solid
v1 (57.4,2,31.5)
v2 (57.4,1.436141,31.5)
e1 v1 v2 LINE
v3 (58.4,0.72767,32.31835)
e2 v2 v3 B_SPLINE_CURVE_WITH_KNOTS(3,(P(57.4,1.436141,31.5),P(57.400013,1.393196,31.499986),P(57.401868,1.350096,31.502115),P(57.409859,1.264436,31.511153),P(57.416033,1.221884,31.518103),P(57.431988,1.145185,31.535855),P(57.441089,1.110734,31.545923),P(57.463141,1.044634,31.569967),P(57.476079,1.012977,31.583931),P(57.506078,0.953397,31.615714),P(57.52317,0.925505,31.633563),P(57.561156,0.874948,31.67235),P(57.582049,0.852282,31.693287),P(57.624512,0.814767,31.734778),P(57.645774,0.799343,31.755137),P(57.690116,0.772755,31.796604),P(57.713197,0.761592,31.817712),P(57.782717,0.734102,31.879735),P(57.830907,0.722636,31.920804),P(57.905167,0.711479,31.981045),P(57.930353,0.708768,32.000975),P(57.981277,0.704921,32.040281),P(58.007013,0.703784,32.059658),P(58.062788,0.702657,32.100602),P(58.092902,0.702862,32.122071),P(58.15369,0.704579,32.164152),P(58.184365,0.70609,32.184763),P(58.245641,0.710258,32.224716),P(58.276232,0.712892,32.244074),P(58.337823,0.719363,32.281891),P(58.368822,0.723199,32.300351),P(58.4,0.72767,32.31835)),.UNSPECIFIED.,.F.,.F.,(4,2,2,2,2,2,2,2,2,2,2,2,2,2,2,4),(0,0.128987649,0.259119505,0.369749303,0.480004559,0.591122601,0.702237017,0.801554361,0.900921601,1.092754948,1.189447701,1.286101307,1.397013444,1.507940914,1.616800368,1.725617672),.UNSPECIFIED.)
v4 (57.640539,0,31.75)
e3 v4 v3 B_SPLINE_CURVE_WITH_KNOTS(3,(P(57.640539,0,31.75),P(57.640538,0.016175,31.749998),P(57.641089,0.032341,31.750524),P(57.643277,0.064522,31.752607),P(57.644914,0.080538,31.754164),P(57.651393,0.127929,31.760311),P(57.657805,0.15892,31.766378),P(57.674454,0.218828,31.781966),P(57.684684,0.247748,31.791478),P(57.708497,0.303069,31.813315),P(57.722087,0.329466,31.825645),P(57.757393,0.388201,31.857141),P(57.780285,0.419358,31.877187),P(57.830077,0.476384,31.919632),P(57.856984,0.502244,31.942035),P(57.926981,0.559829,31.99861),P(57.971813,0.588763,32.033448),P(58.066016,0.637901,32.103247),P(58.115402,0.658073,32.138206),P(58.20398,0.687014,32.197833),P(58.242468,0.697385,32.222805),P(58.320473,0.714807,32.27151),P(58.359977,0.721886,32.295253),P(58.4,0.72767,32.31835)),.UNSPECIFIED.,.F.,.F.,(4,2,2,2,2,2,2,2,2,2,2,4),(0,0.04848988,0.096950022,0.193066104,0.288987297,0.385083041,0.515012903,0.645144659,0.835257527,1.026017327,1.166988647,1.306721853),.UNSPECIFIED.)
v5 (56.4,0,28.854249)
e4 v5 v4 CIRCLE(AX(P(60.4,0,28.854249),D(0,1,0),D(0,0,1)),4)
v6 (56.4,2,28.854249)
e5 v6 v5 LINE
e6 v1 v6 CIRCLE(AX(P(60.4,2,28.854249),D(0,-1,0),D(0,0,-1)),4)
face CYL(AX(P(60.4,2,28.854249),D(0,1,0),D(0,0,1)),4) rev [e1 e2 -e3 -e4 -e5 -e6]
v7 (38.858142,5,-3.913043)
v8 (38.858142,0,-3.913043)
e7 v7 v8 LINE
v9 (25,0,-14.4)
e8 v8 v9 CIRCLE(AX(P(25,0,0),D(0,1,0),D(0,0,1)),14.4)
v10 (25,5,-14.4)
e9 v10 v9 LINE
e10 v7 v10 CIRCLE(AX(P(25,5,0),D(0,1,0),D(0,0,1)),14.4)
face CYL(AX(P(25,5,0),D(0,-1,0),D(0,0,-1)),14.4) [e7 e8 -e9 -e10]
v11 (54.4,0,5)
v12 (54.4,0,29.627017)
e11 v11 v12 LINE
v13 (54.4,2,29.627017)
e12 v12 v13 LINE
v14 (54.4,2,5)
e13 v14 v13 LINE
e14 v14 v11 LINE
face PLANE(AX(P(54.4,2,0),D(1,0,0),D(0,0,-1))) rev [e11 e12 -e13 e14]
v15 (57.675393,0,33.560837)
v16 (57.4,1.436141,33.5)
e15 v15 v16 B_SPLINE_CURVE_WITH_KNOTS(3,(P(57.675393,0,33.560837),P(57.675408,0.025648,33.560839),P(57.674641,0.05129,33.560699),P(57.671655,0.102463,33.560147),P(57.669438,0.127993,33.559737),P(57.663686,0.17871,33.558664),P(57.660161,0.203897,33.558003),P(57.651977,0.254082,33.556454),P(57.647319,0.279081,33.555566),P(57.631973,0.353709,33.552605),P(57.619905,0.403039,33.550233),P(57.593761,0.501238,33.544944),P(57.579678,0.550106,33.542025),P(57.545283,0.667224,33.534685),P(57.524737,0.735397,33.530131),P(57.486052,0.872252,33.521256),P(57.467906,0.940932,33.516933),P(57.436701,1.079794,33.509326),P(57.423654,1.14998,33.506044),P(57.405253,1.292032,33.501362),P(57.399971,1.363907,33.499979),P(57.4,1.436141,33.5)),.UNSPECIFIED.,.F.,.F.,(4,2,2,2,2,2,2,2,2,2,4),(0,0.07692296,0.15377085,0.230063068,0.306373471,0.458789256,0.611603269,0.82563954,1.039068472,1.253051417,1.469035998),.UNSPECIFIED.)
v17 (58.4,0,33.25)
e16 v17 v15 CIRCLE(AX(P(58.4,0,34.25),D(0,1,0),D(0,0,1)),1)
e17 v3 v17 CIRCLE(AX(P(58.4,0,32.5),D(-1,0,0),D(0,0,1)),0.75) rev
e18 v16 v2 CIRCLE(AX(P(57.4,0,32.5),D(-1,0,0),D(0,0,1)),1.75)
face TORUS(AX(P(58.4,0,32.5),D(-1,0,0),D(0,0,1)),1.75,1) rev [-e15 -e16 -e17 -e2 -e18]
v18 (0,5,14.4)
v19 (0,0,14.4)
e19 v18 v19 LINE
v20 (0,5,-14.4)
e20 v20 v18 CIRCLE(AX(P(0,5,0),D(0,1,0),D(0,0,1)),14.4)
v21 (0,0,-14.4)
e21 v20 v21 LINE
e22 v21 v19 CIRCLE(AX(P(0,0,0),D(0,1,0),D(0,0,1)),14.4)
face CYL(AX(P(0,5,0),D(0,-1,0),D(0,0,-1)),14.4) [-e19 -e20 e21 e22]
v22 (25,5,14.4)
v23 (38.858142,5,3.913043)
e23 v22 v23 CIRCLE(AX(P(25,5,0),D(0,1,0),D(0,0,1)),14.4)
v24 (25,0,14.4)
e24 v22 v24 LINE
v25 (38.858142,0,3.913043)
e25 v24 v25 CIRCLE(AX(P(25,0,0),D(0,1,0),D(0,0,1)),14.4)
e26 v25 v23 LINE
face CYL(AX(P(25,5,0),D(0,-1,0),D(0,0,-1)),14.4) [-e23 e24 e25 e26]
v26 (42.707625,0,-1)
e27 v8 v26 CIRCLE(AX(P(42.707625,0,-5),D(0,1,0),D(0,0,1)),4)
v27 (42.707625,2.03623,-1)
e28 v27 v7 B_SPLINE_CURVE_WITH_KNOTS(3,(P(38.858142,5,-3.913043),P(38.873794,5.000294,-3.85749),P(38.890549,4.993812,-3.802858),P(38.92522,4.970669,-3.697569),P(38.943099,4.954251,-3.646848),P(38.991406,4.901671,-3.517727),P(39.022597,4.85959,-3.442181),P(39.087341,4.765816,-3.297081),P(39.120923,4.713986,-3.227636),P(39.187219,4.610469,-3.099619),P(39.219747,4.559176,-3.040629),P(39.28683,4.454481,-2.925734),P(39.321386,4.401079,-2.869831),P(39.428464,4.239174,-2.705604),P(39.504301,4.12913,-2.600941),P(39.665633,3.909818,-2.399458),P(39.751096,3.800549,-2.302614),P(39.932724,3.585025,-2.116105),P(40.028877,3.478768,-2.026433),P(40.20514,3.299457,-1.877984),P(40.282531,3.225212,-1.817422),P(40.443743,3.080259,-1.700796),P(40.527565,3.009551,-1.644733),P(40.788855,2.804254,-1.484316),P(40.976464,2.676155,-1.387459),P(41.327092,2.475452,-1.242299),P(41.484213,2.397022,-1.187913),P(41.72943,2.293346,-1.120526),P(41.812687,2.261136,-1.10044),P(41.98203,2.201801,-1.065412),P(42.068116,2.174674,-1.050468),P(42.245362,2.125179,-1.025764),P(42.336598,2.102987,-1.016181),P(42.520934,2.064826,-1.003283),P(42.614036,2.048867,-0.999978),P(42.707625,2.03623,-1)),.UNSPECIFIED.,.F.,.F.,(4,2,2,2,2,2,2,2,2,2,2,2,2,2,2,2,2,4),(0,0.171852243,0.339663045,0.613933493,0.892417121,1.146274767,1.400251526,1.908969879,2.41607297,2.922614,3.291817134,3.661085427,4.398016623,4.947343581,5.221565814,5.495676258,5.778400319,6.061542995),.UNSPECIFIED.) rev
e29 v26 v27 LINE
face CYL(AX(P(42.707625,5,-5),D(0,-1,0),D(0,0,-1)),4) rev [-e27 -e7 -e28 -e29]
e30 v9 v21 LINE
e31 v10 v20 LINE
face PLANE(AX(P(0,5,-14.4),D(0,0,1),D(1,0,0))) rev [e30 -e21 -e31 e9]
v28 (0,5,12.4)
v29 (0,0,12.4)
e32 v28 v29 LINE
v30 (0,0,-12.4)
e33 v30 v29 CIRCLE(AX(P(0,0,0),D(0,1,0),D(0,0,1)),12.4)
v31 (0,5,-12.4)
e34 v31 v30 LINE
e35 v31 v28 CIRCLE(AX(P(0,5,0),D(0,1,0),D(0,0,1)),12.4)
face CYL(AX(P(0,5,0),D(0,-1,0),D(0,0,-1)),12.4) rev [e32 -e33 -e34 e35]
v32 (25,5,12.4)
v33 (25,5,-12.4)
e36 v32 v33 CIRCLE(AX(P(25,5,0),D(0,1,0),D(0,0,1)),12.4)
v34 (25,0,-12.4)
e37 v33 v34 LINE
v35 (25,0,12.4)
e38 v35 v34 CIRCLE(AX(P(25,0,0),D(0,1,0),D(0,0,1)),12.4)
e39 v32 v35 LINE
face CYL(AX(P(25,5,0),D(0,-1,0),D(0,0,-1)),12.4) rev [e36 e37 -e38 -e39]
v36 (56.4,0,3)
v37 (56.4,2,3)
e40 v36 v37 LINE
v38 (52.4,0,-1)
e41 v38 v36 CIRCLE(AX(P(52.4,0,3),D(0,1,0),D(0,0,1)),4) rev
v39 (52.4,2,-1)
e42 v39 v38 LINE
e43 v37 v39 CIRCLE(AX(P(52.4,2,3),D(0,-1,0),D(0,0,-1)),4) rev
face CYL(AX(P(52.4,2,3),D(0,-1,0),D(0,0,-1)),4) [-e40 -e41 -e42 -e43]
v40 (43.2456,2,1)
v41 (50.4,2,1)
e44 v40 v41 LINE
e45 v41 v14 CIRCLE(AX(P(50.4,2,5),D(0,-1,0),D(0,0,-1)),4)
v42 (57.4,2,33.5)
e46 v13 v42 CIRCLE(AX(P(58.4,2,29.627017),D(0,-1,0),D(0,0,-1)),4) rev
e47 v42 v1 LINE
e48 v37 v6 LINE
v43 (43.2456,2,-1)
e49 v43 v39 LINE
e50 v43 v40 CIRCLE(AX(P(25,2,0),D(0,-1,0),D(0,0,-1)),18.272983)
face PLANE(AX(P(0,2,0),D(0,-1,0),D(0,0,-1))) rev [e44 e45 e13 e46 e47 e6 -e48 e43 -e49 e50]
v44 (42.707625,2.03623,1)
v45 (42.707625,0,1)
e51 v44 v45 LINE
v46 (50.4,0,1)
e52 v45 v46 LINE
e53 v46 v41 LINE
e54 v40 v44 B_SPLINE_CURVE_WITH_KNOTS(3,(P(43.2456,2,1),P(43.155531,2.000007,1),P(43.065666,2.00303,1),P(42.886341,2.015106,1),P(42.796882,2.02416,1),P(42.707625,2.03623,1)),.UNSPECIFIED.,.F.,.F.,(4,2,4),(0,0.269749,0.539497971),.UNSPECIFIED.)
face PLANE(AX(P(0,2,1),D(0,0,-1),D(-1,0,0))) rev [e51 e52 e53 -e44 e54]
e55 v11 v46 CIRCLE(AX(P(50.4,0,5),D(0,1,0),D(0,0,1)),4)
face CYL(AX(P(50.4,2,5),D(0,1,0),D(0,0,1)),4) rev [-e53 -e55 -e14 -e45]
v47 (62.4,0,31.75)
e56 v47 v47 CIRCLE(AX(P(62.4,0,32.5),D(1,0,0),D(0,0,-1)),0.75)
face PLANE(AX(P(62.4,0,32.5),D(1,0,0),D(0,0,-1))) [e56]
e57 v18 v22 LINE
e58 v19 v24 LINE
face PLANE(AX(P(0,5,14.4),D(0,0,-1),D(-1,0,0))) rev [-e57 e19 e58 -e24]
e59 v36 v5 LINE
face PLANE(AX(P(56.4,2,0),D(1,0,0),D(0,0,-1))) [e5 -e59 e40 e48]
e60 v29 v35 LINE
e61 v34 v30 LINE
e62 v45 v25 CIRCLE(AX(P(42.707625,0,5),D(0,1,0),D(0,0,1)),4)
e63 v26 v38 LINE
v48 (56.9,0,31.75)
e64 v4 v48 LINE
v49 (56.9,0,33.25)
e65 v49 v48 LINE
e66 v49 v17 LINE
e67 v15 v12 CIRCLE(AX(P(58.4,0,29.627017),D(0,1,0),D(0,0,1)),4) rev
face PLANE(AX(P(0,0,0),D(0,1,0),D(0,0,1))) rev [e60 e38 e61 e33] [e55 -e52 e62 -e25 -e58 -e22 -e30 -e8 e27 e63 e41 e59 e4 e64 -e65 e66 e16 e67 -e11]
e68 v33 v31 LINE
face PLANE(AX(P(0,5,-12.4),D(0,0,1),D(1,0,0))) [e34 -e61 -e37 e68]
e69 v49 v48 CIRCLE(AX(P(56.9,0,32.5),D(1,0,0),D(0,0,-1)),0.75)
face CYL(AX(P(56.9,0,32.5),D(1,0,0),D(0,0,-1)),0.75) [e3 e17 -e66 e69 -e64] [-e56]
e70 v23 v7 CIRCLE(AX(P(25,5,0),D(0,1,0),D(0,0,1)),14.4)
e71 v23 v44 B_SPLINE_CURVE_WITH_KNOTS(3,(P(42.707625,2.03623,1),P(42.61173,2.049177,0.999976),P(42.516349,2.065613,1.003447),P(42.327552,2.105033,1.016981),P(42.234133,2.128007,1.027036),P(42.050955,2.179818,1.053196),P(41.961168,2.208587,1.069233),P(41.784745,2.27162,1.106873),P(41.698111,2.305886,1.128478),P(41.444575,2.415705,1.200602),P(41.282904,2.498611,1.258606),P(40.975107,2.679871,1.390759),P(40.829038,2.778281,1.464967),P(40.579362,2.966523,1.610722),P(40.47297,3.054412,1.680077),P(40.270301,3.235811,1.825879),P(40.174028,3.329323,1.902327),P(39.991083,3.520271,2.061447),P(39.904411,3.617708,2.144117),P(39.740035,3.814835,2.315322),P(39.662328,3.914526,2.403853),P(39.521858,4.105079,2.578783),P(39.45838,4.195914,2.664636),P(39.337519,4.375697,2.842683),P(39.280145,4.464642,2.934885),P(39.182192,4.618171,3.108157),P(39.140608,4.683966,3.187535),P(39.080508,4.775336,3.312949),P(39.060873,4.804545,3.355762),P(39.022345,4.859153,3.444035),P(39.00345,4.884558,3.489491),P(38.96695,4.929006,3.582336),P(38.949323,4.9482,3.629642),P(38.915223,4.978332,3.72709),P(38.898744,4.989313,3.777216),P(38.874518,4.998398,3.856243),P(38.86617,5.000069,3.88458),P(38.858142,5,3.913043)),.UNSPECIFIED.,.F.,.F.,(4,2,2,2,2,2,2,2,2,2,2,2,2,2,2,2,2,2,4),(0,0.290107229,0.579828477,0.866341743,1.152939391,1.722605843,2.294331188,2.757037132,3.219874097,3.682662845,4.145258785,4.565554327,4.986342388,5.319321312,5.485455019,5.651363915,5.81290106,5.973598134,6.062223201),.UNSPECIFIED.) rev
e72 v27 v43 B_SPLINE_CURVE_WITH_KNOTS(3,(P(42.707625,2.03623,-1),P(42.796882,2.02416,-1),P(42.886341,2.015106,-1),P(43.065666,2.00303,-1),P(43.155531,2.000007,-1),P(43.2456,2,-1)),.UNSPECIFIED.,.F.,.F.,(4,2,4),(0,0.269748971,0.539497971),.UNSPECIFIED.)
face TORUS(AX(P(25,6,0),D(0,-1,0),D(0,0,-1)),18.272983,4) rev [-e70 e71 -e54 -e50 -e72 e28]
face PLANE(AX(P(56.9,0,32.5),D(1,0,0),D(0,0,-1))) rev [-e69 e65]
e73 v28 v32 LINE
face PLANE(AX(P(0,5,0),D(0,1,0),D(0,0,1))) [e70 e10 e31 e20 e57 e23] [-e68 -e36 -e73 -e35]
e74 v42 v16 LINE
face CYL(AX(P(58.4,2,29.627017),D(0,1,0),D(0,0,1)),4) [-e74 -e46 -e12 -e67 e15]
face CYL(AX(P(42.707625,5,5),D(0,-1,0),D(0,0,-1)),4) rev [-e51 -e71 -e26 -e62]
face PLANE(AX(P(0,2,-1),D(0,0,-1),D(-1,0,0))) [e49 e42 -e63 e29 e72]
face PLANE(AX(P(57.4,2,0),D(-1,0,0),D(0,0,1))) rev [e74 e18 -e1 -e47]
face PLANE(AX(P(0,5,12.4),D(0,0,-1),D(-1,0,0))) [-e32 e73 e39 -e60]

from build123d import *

# Parameters (mm, degrees)
BOSS_EXTRUDE1_DEPTH      = 5
SKETCH2_W                = 1
SKETCH2_H                = 2
SKETCH2_W_2              = 2
SKETCH2_H_2              = 30.5
BOSS_EXTRUDE2_DEPTH      = 2
FILLET1_R                = 4
BOSS_EXTRUDE3_DEPTH      = 5
BOSS_EXTRUDE3_DEPTH_BACK = 0.5
SKETCH3_R                = 0.75
FILLET3_R                = 1


with BuildPart() as part:
    # Sketch1 → Boss-Extrude1 (new body)
    with BuildSketch(Plane(origin=(0, 0, 0), x_dir=(1, 0, 0), z_dir=(0, 1, 0))):
        with BuildLine():
            Line((0, 14.4), (25, 14.4))
            ThreePointArc((25, 14.4), (39.4, 0), (25, -14.4))
            Line((25, -14.4), (0, -14.4))
            ThreePointArc((0, -14.4), (-14.4, 0), (0, 14.4))
        make_face()
        with BuildLine():
            Line((0, 12.4), (25, 12.4))
            ThreePointArc((25, 12.4), (37.4, 0), (25, -12.4))
            Line((25, -12.4), (0, -12.4))
            ThreePointArc((0, -12.4), (-12.4, 0), (0, 12.4))
        make_face(mode=Mode.SUBTRACT)
    extrude(amount=BOSS_EXTRUDE1_DEPTH)

    # Sketch2 → Boss-Extrude2 (add)
    with BuildSketch(Plane.XZ):
        with Locations((56.9, 32.5)):
            Rectangle(SKETCH2_W, SKETCH2_H)
        with Locations((55.4, 32.5)):
            Rectangle(SKETCH2_W_2, SKETCH2_H)
        with Locations((55.4, 16.25)):
            Rectangle(SKETCH2_W_2, SKETCH2_H_2)
        with BuildLine():
            Line((39.365235814, -1), (54.4, -1))
            Line((54.4, -1), (54.4, 1))
            Line((54.4, 1), (39.365235814, 1))
            ThreePointArc((39.365235814, 1), (39.4, 0), (39.365235814, -1))
        make_face()
        with Locations((55.4, 0)):
            Rectangle(SKETCH2_W_2, SKETCH2_H)
        with BuildLine():
            Line((37.4, -1), (39.365235814, -1))
            ThreePointArc((39.365235814, -1), (39.4, 0), (39.365235814, 1))
            Line((39.365235814, 1), (37.4, 1))
            Line((37.4, 1), (37.4, -1))
        make_face()
    extrude(amount=-BOSS_EXTRUDE2_DEPTH)

    # Fillet1
    # the kernel refuses this fillet: 4 mm, written as the material it adds along each edge
    with BuildSketch(Plane(origin=(25, 2, 0), x_dir=(0.7371891614816782, 0, -0.6756864214959037), z_dir=(-0.6756864214959037, 0, -0.7371891614816782))) as fillet1_piece_1_section:
        with BuildLine():
            CenterArc((18.272983346, -4), FILLET1_R, 90, 75.522487814)
            Line((18.272983346, 0), (18.272983346, 0.08))
            Line((18.272983346, 0.08), (14.4, 0.08))
            Line((14.4, 0.08), (14.32, 0))
            ThreePointArc((14.32, 0), (14.32, -1.5), (14.322540333, -2.98))
            Line((14.322540333, -2.98), (14.4, -3))
        make_face()
    fillet1_piece_1 = revolve(axis=Axis((25, 2, 0), (0, -1, 0)), revolution_arc=85.014954966, mode=Mode.PRIVATE)
    fillet1_piece_1 = split(fillet1_piece_1, bisect_by=Plane(origin=(40.301586348, 2.758397987, -1), z_dir=(0, 0, 1)), keep=Keep.TOP, mode=Mode.PRIVATE)
    fillet1_piece_1 = split(fillet1_piece_1, bisect_by=Plane(origin=(40.301586348, 2.758397987, 1), z_dir=(0, 0, -1)), keep=Keep.TOP, mode=Mode.PRIVATE)
    add(fillet1_piece_1)
    with BuildSketch(Plane(origin=(39.365235814, 2, 1), x_dir=(-0.17149804582148107, 0, 0.9851844600273663), z_dir=(0, -1, 0))) as fillet1_piece_2:
        with BuildLine():
            CenterArc((3.367524545, -3.978862537), FILLET1_R, 95.892851455, 74.232218513)
            Line((-0.573213295, -3.292870354), (-0.652028052, -3.27915051))
            Line((-0.652028052, -3.27915051), (-0.078814757, 0.013719844))
            Line((-0.078814757, 0.013719844), (0.008213474, 0.079577251))
            ThreePointArc((0.008213474, 0.079577251), (1.47842541, 0.003905135), (2.948637345, 0.079577251))
            Line((2.948637345, 0.079577251), (2.95685082, 0))
        make_face()
    extrude(amount=2)
    with BuildSketch(Plane(origin=(39.365235814, 2, -1), x_dir=(-0.17149804582148342, 0, -0.9851844600273658), z_dir=(0, -1, 0))) as fillet1_piece_3:
        with BuildLine():
            CenterArc((3.367524545, 3.978862537), FILLET1_R, 189.874930032, 74.232218513)
            Line((-0.573213295, 3.292870354), (-0.652028052, 3.27915051))
            Line((-0.652028052, 3.27915051), (-0.078814757, -0.013719844))
            Line((-0.078814757, -0.013719844), (0.008213474, -0.079577251))
            ThreePointArc((0.008213474, -0.079577251), (1.47842541, -0.003905135), (2.948637345, -0.079577251))
            Line((2.948637345, -0.079577251), (2.95685082, 0))
        make_face()
    extrude(amount=2)
    with BuildSketch(Plane(origin=(54.4, 0, 1), x_dir=(-1, 0, 0), z_dir=(0, 1, 0))) as fillet1_piece_4:
        with BuildLine():
            CenterArc((FILLET1_R, FILLET1_R), FILLET1_R, 180, 90)
            Line((0, FILLET1_R), (-FILLET1_R * 0.02, FILLET1_R))
            Line((-FILLET1_R * 0.02, FILLET1_R), (-FILLET1_R * 0.02, -FILLET1_R * 0.02))
            Line((-FILLET1_R * 0.02, -FILLET1_R * 0.02), (FILLET1_R, -FILLET1_R * 0.02))
            Line((FILLET1_R, -FILLET1_R * 0.02), (FILLET1_R, 0))
        make_face()
    extrude(amount=2)
    with BuildSketch(Plane(origin=(56.4, 0, 31.5), x_dir=(0, 0, -1), z_dir=(0, 1, 0))) as fillet1_piece_5:
        with BuildLine():
            CenterArc((2.645751311, -4), FILLET1_R, 90, 41.409622109)
            Line((0, -1), (-0.052915026, -0.94))
            ThreePointArc((-0.052915026, -0.94), (-0.08, -0.5), (-0.08, 0))
            Line((-0.08, 0), (0, 0.08))
            Line((0, 0.08), (2.645751311, 0.08))
            Line((2.645751311, 0.08), (2.645751311, 0))
        make_face()
    extrude(amount=2)
    with BuildSketch(Plane(origin=(39.365235814, 10.355974154, -1), x_dir=(-0.1714980458214834, 0, -0.9851844600273658), z_dir=(0, -1, 0))) as fillet1_piece_6a_section:
        with BuildLine():
            CenterArc((3.367524545, 3.978862537), FILLET1_R, 189.874930032, 74.232218513)
            Line((-0.573213295, 3.292870354), (-0.652028052, 3.27915051))
            Line((-0.652028052, 3.27915051), (-0.078814757, -0.013719844))
            Line((-0.078814757, -0.013719844), (0.008213474, -0.079577251))
            ThreePointArc((0.008213474, -0.079577251), (1.47842541, -0.003905135), (2.948637345, -0.079577251))
            Line((2.948637345, -0.079577251), (2.95685082, 0))
        make_face()
    fillet1_piece_6a = extrude(amount=10.355974154, mode=Mode.PRIVATE)
    fillet1_piece_6a = split(fillet1_piece_6a, bisect_by=Plane(origin=(40.057221624, 5, -1.646357347), z_dir=(0, -1, 0)), keep=Keep.TOP, mode=Mode.PRIVATE)
    fillet1_piece_6a = split(fillet1_piece_6a, bisect_by=Plane(origin=(40.057221624, 2, -1.646357347), z_dir=(0, 1, 0)), keep=Keep.TOP, mode=Mode.PRIVATE)
    with BuildSketch(Plane(origin=(25, 2, 0), x_dir=(0.7371891614816782, 0, -0.6756864214959037), z_dir=(-0.6756864214959037, 0, -0.7371891614816782))) as fillet1_piece_6b_section:
        with BuildLine():
            CenterArc((18.272983346, -4), FILLET1_R, 90, 75.522487814)
            Line((18.272983346, 0), (18.272983346, 0.08))
            Line((18.272983346, 0.08), (14.4, 0.08))
            Line((14.4, 0.08), (14.32, 0))
            ThreePointArc((14.32, 0), (14.32, -1.5), (14.322540333, -2.98))
            Line((14.322540333, -2.98), (14.4, -3))
        make_face()
    fillet1_piece_6b = revolve(axis=Axis((25, 2, 0), (0, -1, 0)), revolution_arc=85.014954966, mode=Mode.PRIVATE)
    fillet1_piece_6b = split(fillet1_piece_6b, bisect_by=Plane(origin=(38.861424428, 2.733448244, -1), z_dir=(0, 0, -1)), keep=Keep.TOP, mode=Mode.PRIVATE)
    fillet1_piece_6 = fillet1_piece_6a & fillet1_piece_6b
    add(fillet1_piece_6)
    with BuildSketch(Plane(origin=(25, 2, 0), x_dir=(0.7371891614816782, 0, -0.6756864214959037), z_dir=(-0.6756864214959037, 0, -0.7371891614816782))) as fillet1_piece_7a_section:
        with BuildLine():
            CenterArc((18.272983346, -4), FILLET1_R, 90, 75.522487814)
            Line((18.272983346, 0), (18.272983346, 0.08))
            Line((18.272983346, 0.08), (14.4, 0.08))
            Line((14.4, 0.08), (14.32, 0))
            ThreePointArc((14.32, 0), (14.32, -1.5), (14.322540333, -2.98))
            Line((14.322540333, -2.98), (14.4, -3))
        make_face()
    fillet1_piece_7a = revolve(axis=Axis((25, 2, 0), (0, -1, 0)), revolution_arc=85.014954966, mode=Mode.PRIVATE)
    fillet1_piece_7a = split(fillet1_piece_7a, bisect_by=Plane(origin=(38.861423807, 2.733448455, 1), z_dir=(0, 0, 1)), keep=Keep.TOP, mode=Mode.PRIVATE)
    with BuildSketch(Plane(origin=(39.365235814, 10.355974154, 1), x_dir=(-0.17149804582148107, 0, 0.9851844600273663), z_dir=(0, -1, 0))) as fillet1_piece_7b_section:
        with BuildLine():
            CenterArc((3.367524545, -3.978862537), FILLET1_R, 95.892851455, 74.232218513)
            Line((-0.573213295, -3.292870354), (-0.652028052, -3.27915051))
            Line((-0.652028052, -3.27915051), (-0.078814757, 0.013719844))
            Line((-0.078814757, 0.013719844), (0.008213474, 0.079577251))
            ThreePointArc((0.008213474, 0.079577251), (1.47842541, 0.003905135), (2.948637345, 0.079577251))
            Line((2.948637345, 0.079577251), (2.95685082, 0))
        make_face()
    fillet1_piece_7b = extrude(amount=10.355974154, mode=Mode.PRIVATE)
    fillet1_piece_7b = split(fillet1_piece_7b, bisect_by=Plane(origin=(40.057221624, 5, 1.646357347), z_dir=(0, -1, 0)), keep=Keep.TOP, mode=Mode.PRIVATE)
    fillet1_piece_7b = split(fillet1_piece_7b, bisect_by=Plane(origin=(40.057221624, 2, 1.646357347), z_dir=(0, 1, 0)), keep=Keep.TOP, mode=Mode.PRIVATE)
    fillet1_piece_7 = fillet1_piece_7a & fillet1_piece_7b
    add(fillet1_piece_7)
    # the kernel refuses this fillet: 4 mm, written as the material it takes off along each edge
    with BuildSketch(Plane(origin=(56.4, -10, -1), x_dir=(-1, 0, 0), z_dir=(0, 1, 0))) as fillet1_2_piece_1:
        with BuildLine():
            CenterArc((FILLET1_R, FILLET1_R), FILLET1_R, 180, 90)
            Line((0, FILLET1_R), (-FILLET1_R * 0.02, FILLET1_R))
            Line((-FILLET1_R * 0.02, FILLET1_R), (-FILLET1_R * 0.02, -FILLET1_R * 0.02))
            Line((-FILLET1_R * 0.02, -FILLET1_R * 0.02), (FILLET1_R, -FILLET1_R * 0.02))
            Line((FILLET1_R, -FILLET1_R * 0.02), (FILLET1_R, 0))
        make_face()
    extrude(amount=22, mode=Mode.SUBTRACT)
    with BuildSketch(Plane(origin=(54.4, -9.682458366, 33.5), x_dir=(1, 0, 0), z_dir=(0, 1, 0))) as fillet1_2_piece_2:
        with BuildLine():
            CenterArc((4, 3.872983346), FILLET1_R, 180, 75.522487814)
            Line((0, 3.872983346), (-0.08, 3.872983346))
            Line((-0.08, 3.872983346), (-0.08, 0))
            Line((-0.08, 0), (0, -0.08))
            ThreePointArc((0, -0.08), (1.5, -0.08), (2.98, -0.077459667))
            Line((2.98, -0.077459667), (3, 0))
        make_face()
    extrude(amount=21.364916731, mode=Mode.SUBTRACT)

    # Sketch3 → Boss-Extrude3 (add, two sides: drawn at the far end of the back side and taken through both)
    with BuildSketch(Plane(origin=(57.4, 0, 0), x_dir=(0, 0, -1), z_dir=(1, 0, 0)).offset(-BOSS_EXTRUDE3_DEPTH_BACK)):
        with Locations((-32.5, 0)):
            Circle(SKETCH3_R)
    extrude(amount=BOSS_EXTRUDE3_DEPTH + BOSS_EXTRUDE3_DEPTH_BACK)

    # Fillet3
    # the kernel refuses this fillet: 1 mm, written as the material it adds along each edge
    with BuildSketch(Plane(origin=(57.4, 0, 32.5), x_dir=(0, 0, -1), z_dir=(0, -1, 0))) as fillet3_piece_1_section:
        with BuildLine():
            CenterArc((0.75 + FILLET3_R, FILLET3_R), FILLET3_R, 180, 90)
            Line((0.75, FILLET3_R), (0.75, 0))
            Line((0.75, 0), (0.75 + FILLET3_R, 0))
        make_face()
    fillet3_piece_1 = revolve(axis=Axis((57.4, 0, 32.5), (1, 0, 0)), revolution_arc=180, mode=Mode.PRIVATE)
    fillet3_piece_1 = fillet3_piece_1 & Plane(origin=(58.4, 0.745327828, 29.627016654), x_dir=(1, 0, 0), z_dir=(0, -1, 0)) * Cylinder(4, 7, mode=Mode.PRIVATE)
    fillet3_piece_1 = fillet3_piece_1 - Plane(origin=(60.4, 0.745327828, 28.854248689), x_dir=(0, 0, -1), z_dir=(0, -1, 0)) * Cylinder(4, 7, mode=Mode.PRIVATE)
    add(fillet3_piece_1)


solid = part.part
